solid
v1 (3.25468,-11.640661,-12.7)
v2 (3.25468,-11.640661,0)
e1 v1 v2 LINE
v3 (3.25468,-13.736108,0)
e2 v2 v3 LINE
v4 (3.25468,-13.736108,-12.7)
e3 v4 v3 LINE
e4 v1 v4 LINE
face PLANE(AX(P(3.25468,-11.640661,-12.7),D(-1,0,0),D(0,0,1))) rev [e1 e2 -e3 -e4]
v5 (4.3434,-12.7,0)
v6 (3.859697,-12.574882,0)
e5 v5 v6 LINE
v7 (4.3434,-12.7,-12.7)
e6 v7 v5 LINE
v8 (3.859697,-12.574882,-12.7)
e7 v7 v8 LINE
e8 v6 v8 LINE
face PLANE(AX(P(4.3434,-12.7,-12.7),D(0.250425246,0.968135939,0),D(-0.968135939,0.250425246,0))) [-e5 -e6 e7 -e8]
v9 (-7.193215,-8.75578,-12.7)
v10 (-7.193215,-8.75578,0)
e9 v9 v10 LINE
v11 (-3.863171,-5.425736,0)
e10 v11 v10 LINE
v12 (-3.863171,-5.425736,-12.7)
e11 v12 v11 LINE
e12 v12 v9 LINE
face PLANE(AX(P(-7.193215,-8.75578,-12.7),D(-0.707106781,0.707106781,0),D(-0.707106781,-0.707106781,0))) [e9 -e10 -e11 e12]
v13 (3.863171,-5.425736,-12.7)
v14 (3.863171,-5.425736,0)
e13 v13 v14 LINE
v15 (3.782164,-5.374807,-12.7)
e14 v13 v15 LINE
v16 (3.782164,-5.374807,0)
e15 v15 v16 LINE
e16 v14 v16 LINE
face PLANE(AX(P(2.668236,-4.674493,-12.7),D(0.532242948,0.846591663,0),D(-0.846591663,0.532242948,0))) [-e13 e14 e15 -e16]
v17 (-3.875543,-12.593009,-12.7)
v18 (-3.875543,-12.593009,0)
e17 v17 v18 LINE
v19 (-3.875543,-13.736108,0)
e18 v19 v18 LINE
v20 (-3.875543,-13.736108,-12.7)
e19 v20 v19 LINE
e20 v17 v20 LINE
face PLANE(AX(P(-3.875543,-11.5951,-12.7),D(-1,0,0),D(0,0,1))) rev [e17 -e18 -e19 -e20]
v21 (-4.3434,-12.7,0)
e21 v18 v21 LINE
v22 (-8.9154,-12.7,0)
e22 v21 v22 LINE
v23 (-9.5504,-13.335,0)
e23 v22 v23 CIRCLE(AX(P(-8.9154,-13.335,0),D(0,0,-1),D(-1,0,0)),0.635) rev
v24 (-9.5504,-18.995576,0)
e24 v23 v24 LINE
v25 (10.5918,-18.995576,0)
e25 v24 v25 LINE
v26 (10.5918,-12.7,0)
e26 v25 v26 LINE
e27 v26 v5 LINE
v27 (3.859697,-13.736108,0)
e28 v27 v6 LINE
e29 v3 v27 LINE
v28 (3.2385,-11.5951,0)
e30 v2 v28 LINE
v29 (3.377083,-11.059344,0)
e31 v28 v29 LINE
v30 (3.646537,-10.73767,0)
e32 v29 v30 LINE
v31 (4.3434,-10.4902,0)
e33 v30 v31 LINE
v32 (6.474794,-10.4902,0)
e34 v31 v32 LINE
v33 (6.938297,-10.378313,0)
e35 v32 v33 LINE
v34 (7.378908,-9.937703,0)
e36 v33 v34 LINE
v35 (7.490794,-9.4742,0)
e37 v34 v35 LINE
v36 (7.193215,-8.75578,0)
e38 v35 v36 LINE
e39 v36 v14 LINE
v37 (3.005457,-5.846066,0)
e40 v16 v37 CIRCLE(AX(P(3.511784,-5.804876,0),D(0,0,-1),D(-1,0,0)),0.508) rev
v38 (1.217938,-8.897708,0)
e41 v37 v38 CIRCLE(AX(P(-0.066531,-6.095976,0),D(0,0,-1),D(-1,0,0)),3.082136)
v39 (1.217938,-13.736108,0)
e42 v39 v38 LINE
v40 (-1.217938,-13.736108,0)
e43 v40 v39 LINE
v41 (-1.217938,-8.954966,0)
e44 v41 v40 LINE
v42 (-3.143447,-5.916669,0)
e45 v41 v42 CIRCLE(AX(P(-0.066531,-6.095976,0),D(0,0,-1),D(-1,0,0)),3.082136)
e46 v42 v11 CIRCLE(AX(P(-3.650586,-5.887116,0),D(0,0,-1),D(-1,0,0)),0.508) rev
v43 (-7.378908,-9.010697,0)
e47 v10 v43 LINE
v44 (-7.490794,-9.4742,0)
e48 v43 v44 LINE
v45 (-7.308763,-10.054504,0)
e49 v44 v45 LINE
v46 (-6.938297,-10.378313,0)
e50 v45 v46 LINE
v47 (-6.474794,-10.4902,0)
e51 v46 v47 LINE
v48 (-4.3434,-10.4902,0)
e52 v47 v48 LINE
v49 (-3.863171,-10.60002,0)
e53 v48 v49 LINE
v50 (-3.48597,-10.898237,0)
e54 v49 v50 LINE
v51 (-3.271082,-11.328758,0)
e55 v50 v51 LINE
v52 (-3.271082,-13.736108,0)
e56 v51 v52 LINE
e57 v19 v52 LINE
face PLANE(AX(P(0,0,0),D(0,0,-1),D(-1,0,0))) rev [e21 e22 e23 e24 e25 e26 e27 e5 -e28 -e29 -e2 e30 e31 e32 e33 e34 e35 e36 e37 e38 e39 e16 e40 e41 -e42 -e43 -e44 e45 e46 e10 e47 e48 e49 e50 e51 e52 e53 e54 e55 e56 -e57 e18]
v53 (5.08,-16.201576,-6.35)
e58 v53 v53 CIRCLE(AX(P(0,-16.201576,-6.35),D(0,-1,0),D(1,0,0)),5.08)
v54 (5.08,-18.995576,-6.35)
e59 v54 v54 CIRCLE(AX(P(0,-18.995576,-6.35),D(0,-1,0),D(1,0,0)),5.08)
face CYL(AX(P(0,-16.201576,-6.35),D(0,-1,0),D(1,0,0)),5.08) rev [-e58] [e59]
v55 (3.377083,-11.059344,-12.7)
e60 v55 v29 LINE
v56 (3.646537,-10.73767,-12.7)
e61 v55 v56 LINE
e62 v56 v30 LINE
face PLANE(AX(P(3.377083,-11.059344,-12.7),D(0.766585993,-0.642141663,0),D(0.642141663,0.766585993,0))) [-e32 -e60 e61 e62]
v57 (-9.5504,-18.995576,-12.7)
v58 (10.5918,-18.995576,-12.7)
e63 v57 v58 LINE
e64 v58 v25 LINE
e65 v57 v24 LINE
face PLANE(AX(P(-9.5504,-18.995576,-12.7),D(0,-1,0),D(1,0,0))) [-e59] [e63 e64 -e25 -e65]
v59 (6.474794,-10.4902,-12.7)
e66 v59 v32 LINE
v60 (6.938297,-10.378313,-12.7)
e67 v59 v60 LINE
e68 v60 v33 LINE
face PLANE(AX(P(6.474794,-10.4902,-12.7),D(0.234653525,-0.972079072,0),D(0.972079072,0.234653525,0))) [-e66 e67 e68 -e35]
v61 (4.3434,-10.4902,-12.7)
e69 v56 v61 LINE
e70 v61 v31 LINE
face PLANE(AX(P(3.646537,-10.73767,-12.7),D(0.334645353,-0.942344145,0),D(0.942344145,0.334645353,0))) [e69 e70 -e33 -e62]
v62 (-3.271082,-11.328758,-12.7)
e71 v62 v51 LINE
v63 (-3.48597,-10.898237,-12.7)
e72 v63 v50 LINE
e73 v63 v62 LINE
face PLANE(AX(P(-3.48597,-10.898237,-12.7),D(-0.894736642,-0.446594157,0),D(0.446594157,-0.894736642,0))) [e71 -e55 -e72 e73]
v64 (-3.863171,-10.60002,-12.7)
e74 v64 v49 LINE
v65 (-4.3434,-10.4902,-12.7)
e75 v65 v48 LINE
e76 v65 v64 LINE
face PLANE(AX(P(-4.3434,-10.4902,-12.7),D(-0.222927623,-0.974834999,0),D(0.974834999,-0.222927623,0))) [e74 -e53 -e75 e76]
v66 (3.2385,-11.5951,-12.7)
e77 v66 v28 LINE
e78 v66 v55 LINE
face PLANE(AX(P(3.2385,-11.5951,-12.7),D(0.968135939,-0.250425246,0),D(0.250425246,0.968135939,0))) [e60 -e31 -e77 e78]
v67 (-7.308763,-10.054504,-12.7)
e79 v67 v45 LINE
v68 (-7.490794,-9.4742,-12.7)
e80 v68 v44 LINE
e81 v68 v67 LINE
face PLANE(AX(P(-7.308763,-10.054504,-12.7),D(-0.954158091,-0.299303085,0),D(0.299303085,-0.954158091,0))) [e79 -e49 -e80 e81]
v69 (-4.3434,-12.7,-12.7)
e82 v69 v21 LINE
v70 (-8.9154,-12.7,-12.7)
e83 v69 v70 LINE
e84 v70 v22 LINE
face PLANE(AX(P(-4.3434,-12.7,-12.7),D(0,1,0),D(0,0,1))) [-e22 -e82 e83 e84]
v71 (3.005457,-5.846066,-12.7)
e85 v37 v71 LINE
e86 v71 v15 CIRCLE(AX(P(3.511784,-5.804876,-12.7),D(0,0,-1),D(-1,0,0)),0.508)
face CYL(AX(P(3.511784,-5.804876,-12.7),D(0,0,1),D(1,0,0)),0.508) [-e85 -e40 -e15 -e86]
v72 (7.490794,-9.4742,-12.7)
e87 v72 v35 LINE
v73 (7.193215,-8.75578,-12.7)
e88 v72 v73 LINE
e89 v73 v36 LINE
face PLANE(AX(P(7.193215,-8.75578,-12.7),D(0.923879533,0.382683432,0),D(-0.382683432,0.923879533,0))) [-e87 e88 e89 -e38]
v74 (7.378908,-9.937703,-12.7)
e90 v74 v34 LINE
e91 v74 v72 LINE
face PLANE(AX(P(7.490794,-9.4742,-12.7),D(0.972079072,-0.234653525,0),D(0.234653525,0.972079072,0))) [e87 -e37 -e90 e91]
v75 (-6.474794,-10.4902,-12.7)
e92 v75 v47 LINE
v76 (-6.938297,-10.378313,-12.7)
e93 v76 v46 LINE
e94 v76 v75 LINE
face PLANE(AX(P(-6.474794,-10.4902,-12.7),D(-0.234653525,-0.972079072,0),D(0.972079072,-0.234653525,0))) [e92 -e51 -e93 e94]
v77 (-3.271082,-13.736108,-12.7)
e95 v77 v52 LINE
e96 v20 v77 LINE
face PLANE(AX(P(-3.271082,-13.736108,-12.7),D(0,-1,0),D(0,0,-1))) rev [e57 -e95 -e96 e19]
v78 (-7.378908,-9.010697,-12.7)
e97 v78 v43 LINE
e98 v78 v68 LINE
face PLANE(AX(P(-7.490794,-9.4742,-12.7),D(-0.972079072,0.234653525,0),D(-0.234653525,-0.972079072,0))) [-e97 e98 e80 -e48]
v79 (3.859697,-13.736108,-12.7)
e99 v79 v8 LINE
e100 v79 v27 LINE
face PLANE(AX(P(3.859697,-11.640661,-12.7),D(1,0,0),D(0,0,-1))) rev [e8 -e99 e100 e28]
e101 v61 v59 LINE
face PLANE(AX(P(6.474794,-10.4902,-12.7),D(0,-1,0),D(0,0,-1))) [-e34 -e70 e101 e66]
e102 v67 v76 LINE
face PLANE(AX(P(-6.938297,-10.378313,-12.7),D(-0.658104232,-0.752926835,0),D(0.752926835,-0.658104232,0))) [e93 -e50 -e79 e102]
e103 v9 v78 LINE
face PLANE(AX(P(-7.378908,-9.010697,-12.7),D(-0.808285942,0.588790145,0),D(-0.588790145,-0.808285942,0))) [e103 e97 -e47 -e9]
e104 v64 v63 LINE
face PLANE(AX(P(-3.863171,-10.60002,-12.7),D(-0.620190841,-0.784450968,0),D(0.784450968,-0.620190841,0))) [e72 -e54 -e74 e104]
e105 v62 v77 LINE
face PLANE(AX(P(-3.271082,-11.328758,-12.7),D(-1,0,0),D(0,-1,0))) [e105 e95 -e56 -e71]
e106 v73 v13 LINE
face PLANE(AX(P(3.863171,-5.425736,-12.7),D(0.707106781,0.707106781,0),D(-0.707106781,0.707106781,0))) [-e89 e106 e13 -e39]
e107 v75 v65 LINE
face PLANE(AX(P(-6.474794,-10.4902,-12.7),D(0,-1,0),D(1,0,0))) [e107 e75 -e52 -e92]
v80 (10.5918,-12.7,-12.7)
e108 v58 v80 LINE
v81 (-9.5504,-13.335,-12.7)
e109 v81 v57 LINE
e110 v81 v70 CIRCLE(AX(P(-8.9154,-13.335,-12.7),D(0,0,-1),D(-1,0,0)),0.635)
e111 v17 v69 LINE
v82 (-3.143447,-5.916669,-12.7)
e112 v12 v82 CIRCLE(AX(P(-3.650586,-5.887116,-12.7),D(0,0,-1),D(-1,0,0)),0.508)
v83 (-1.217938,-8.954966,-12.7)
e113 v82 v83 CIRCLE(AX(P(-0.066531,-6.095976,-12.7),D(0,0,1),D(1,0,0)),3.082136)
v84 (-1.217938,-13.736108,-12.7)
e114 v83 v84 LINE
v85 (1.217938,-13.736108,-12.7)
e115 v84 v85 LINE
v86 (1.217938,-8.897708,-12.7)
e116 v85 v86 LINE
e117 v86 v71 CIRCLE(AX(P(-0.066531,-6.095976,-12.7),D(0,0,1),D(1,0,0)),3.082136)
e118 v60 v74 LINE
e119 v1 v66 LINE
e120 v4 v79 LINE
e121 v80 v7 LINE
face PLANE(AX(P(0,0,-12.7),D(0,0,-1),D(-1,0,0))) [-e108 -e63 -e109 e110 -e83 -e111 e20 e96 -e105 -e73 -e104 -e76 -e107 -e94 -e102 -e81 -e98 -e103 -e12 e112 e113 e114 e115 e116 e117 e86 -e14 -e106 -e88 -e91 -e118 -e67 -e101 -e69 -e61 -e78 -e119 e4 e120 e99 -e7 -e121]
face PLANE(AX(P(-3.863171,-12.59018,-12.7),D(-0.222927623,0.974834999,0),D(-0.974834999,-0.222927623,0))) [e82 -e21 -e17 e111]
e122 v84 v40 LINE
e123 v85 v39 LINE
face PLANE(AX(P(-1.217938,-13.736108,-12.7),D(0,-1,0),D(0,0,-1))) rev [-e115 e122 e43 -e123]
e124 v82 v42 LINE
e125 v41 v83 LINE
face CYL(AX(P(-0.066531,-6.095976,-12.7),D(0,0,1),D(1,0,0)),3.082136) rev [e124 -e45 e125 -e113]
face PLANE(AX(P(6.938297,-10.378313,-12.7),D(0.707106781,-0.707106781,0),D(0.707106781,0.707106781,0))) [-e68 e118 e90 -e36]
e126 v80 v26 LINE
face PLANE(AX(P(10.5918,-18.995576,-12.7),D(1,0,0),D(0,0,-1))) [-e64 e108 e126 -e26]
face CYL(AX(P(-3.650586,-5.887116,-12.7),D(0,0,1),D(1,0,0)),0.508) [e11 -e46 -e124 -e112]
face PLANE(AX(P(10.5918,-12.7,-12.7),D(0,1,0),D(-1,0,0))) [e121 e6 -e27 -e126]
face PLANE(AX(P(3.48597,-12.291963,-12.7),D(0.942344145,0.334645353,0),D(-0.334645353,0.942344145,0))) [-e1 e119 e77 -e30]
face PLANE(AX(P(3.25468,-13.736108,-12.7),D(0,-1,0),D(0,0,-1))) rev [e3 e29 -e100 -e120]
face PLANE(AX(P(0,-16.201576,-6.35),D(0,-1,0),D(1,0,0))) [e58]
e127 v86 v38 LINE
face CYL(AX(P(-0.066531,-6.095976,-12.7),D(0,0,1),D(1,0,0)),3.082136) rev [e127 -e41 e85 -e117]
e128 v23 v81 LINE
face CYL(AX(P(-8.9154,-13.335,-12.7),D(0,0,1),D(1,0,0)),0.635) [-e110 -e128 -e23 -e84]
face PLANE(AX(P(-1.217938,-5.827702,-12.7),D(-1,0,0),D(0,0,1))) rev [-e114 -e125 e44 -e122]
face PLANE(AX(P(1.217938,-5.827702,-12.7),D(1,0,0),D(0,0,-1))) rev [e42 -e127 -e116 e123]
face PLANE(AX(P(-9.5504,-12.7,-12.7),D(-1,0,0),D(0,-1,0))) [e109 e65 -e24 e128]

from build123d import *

# Parameters (mm, degrees)
BOSS_EXTRUDE1_DEPTH = 12.7
SKETCH10_R          = 3.082136138
CUT_EXTRUDE1_DEPTH  = 26.185474767
SKETCH11_W          = 2.435876878
SKETCH11_H          = 7.908405343
CUT_EXTRUDE2_DEPTH  = 26.185474767
FILLET1_R           = 0.635
FILLET3_R           = 0.508
SKETCH17_W          = 0.605016918
SKETCH17_H          = 2.095446093
SKETCH17_W_2        = 0.604461085
SKETCH17_H_2        = 2.141007526
CUT_EXTRUDE7_DEPTH  = 26.185474767
SKETCH18_R          = 5.08
CUT_EXTRUDE8_DEPTH  = 2.794


with BuildPart() as part:
    # Sketch5 → Boss-Extrude1 (new body)
    with BuildSketch(Plane.XY):
        Polygon((-6.474794456, -10.4902), (-6.938297275, -10.378313453), (-7.308763147, -10.05450356), (-7.490794456, -9.4742), (-7.378907909, -9.01069718), (-7.193214945, -8.75577951), (-3.863171405, -5.42573597), (-2.833127272, -4.737482484), (-1.618107374, -4.4958), (1.618107374, -4.4958), (2.668236067, -4.674493152), (3.863171405, -5.42573597), (7.193214945, -8.75577951), (7.490794456, -9.4742), (7.378907909, -9.93770282), (6.938297275, -10.378313453), (6.474794456, -10.4902), (4.3434, -10.4902), (3.646537163, -10.737670005), (3.377082754, -11.059343535), (3.2385, -11.5951), (3.485970005, -12.291962837), (3.807643535, -12.561417246), (4.3434, -12.7), (10.5918, -12.7), (10.5918, -18.995576116), (-9.5504, -18.995576116), (-9.5504, -12.7), (-4.3434, -12.7), (-3.863171405, -12.590180165), (-3.485969976, -12.291962837), (-3.271081829, -11.861441531), (-3.271081829, -11.328758469), (-3.485969976, -10.898237163), (-3.863171405, -10.600019835), (-4.3434, -10.4902), align=None)
    extrude(amount=-BOSS_EXTRUDE1_DEPTH)

    # Sketch10 → Cut-Extrude1 (cut, through all)
    with BuildSketch(Plane.XY):
        with Locations((-0.066530556, -6.095976424)):
            Circle(SKETCH10_R)
    extrude(amount=-CUT_EXTRUDE1_DEPTH, mode=Mode.SUBTRACT)

    # Sketch11 → Cut-Extrude2 (cut, through all)
    with BuildSketch(Plane.XY):
        with Locations((0, -9.781904855)):
            Rectangle(SKETCH11_W, SKETCH11_H)
    extrude(amount=-CUT_EXTRUDE2_DEPTH, mode=Mode.SUBTRACT)

    # Fillet1
    fillet1_edges = [part.edges().sort_by_distance(p)[0] for p in [
        (-9.5504, -12.7, -6.35),
    ]]
    fillet(fillet1_edges, radius=FILLET1_R)

    # Fillet3
    # the kernel refuses this fillet: 0.508 mm, written as the material it takes off along each edge
    with BuildSketch(Plane(origin=(2.668236067, -4.674493152, 3.28944818), x_dir=(0.8465916632907232, -0.5322429479538895, 0), z_dir=(0, 0, -1))) as fillet3_piece_1:
        with BuildLine():
            CenterArc((1.315779272, 0.508), FILLET3_R, 143.192029884, 126.807970116)
            Line((0.90905007, 0.812360569), (0.900915486, 0.81844778))
            ThreePointArc((0.900915486, 0.81844778), (0.488321858, 0.368360866), (-0.005137978, 0.008765089))
            Line((-0.005137978, 0.008765089), (0, -0.01016))
            Line((0, -0.01016), (1.315779272, -0.01016))
            Line((1.315779272, -0.01016), (1.315779272, 0))
        make_face()
    extrude(amount=19.278896361, mode=Mode.SUBTRACT)
    with BuildSketch(Plane(origin=(-2.833127272, -4.737482484, 3.097058862), x_dir=(-0.8314696122997464, -0.5555702330237908, 0), z_dir=(0, 0, -1))) as fillet3_piece_2:
        with BuildLine():
            CenterArc((1.31839441, -0.501729486), FILLET3_R, 99.011665767, 118.073467257)
            Line((0.913142276, -0.808054001), (0.905037233, -0.814180491))
            ThreePointArc((0.905037233, -0.814180491), (0.490196501, -0.366028623), (-0.005094947, -0.008790172))
            Line((-0.005094947, -0.008790172), (0, 0.01016))
            ThreePointArc((0, 0.01016), (0.619411772, 0.01016), (1.237232128, 0.01003459))
            Line((1.237232128, 0.01003459), (1.238823545, 0))
        make_face()
    extrude(amount=18.894117724, mode=Mode.SUBTRACT)

    # Sketch17 → Cut-Extrude7 (cut, through all)
    with BuildSketch(Plane.XY):
        with Locations((3.55718824, -12.68838448)):
            Rectangle(SKETCH17_W, SKETCH17_H)
        with Locations((-3.573312372, -12.665603763)):
            Rectangle(SKETCH17_W_2, SKETCH17_H_2)
    extrude(amount=-CUT_EXTRUDE7_DEPTH, mode=Mode.SUBTRACT)

    # Sketch18 → Cut-Extrude8 (cut)
    with BuildSketch(Plane.XZ.offset(18.995576116)):
        with Locations((0, -6.35)):
            Circle(SKETCH18_R)
    extrude(amount=-CUT_EXTRUDE8_DEPTH, mode=Mode.SUBTRACT)


solid = part.part
